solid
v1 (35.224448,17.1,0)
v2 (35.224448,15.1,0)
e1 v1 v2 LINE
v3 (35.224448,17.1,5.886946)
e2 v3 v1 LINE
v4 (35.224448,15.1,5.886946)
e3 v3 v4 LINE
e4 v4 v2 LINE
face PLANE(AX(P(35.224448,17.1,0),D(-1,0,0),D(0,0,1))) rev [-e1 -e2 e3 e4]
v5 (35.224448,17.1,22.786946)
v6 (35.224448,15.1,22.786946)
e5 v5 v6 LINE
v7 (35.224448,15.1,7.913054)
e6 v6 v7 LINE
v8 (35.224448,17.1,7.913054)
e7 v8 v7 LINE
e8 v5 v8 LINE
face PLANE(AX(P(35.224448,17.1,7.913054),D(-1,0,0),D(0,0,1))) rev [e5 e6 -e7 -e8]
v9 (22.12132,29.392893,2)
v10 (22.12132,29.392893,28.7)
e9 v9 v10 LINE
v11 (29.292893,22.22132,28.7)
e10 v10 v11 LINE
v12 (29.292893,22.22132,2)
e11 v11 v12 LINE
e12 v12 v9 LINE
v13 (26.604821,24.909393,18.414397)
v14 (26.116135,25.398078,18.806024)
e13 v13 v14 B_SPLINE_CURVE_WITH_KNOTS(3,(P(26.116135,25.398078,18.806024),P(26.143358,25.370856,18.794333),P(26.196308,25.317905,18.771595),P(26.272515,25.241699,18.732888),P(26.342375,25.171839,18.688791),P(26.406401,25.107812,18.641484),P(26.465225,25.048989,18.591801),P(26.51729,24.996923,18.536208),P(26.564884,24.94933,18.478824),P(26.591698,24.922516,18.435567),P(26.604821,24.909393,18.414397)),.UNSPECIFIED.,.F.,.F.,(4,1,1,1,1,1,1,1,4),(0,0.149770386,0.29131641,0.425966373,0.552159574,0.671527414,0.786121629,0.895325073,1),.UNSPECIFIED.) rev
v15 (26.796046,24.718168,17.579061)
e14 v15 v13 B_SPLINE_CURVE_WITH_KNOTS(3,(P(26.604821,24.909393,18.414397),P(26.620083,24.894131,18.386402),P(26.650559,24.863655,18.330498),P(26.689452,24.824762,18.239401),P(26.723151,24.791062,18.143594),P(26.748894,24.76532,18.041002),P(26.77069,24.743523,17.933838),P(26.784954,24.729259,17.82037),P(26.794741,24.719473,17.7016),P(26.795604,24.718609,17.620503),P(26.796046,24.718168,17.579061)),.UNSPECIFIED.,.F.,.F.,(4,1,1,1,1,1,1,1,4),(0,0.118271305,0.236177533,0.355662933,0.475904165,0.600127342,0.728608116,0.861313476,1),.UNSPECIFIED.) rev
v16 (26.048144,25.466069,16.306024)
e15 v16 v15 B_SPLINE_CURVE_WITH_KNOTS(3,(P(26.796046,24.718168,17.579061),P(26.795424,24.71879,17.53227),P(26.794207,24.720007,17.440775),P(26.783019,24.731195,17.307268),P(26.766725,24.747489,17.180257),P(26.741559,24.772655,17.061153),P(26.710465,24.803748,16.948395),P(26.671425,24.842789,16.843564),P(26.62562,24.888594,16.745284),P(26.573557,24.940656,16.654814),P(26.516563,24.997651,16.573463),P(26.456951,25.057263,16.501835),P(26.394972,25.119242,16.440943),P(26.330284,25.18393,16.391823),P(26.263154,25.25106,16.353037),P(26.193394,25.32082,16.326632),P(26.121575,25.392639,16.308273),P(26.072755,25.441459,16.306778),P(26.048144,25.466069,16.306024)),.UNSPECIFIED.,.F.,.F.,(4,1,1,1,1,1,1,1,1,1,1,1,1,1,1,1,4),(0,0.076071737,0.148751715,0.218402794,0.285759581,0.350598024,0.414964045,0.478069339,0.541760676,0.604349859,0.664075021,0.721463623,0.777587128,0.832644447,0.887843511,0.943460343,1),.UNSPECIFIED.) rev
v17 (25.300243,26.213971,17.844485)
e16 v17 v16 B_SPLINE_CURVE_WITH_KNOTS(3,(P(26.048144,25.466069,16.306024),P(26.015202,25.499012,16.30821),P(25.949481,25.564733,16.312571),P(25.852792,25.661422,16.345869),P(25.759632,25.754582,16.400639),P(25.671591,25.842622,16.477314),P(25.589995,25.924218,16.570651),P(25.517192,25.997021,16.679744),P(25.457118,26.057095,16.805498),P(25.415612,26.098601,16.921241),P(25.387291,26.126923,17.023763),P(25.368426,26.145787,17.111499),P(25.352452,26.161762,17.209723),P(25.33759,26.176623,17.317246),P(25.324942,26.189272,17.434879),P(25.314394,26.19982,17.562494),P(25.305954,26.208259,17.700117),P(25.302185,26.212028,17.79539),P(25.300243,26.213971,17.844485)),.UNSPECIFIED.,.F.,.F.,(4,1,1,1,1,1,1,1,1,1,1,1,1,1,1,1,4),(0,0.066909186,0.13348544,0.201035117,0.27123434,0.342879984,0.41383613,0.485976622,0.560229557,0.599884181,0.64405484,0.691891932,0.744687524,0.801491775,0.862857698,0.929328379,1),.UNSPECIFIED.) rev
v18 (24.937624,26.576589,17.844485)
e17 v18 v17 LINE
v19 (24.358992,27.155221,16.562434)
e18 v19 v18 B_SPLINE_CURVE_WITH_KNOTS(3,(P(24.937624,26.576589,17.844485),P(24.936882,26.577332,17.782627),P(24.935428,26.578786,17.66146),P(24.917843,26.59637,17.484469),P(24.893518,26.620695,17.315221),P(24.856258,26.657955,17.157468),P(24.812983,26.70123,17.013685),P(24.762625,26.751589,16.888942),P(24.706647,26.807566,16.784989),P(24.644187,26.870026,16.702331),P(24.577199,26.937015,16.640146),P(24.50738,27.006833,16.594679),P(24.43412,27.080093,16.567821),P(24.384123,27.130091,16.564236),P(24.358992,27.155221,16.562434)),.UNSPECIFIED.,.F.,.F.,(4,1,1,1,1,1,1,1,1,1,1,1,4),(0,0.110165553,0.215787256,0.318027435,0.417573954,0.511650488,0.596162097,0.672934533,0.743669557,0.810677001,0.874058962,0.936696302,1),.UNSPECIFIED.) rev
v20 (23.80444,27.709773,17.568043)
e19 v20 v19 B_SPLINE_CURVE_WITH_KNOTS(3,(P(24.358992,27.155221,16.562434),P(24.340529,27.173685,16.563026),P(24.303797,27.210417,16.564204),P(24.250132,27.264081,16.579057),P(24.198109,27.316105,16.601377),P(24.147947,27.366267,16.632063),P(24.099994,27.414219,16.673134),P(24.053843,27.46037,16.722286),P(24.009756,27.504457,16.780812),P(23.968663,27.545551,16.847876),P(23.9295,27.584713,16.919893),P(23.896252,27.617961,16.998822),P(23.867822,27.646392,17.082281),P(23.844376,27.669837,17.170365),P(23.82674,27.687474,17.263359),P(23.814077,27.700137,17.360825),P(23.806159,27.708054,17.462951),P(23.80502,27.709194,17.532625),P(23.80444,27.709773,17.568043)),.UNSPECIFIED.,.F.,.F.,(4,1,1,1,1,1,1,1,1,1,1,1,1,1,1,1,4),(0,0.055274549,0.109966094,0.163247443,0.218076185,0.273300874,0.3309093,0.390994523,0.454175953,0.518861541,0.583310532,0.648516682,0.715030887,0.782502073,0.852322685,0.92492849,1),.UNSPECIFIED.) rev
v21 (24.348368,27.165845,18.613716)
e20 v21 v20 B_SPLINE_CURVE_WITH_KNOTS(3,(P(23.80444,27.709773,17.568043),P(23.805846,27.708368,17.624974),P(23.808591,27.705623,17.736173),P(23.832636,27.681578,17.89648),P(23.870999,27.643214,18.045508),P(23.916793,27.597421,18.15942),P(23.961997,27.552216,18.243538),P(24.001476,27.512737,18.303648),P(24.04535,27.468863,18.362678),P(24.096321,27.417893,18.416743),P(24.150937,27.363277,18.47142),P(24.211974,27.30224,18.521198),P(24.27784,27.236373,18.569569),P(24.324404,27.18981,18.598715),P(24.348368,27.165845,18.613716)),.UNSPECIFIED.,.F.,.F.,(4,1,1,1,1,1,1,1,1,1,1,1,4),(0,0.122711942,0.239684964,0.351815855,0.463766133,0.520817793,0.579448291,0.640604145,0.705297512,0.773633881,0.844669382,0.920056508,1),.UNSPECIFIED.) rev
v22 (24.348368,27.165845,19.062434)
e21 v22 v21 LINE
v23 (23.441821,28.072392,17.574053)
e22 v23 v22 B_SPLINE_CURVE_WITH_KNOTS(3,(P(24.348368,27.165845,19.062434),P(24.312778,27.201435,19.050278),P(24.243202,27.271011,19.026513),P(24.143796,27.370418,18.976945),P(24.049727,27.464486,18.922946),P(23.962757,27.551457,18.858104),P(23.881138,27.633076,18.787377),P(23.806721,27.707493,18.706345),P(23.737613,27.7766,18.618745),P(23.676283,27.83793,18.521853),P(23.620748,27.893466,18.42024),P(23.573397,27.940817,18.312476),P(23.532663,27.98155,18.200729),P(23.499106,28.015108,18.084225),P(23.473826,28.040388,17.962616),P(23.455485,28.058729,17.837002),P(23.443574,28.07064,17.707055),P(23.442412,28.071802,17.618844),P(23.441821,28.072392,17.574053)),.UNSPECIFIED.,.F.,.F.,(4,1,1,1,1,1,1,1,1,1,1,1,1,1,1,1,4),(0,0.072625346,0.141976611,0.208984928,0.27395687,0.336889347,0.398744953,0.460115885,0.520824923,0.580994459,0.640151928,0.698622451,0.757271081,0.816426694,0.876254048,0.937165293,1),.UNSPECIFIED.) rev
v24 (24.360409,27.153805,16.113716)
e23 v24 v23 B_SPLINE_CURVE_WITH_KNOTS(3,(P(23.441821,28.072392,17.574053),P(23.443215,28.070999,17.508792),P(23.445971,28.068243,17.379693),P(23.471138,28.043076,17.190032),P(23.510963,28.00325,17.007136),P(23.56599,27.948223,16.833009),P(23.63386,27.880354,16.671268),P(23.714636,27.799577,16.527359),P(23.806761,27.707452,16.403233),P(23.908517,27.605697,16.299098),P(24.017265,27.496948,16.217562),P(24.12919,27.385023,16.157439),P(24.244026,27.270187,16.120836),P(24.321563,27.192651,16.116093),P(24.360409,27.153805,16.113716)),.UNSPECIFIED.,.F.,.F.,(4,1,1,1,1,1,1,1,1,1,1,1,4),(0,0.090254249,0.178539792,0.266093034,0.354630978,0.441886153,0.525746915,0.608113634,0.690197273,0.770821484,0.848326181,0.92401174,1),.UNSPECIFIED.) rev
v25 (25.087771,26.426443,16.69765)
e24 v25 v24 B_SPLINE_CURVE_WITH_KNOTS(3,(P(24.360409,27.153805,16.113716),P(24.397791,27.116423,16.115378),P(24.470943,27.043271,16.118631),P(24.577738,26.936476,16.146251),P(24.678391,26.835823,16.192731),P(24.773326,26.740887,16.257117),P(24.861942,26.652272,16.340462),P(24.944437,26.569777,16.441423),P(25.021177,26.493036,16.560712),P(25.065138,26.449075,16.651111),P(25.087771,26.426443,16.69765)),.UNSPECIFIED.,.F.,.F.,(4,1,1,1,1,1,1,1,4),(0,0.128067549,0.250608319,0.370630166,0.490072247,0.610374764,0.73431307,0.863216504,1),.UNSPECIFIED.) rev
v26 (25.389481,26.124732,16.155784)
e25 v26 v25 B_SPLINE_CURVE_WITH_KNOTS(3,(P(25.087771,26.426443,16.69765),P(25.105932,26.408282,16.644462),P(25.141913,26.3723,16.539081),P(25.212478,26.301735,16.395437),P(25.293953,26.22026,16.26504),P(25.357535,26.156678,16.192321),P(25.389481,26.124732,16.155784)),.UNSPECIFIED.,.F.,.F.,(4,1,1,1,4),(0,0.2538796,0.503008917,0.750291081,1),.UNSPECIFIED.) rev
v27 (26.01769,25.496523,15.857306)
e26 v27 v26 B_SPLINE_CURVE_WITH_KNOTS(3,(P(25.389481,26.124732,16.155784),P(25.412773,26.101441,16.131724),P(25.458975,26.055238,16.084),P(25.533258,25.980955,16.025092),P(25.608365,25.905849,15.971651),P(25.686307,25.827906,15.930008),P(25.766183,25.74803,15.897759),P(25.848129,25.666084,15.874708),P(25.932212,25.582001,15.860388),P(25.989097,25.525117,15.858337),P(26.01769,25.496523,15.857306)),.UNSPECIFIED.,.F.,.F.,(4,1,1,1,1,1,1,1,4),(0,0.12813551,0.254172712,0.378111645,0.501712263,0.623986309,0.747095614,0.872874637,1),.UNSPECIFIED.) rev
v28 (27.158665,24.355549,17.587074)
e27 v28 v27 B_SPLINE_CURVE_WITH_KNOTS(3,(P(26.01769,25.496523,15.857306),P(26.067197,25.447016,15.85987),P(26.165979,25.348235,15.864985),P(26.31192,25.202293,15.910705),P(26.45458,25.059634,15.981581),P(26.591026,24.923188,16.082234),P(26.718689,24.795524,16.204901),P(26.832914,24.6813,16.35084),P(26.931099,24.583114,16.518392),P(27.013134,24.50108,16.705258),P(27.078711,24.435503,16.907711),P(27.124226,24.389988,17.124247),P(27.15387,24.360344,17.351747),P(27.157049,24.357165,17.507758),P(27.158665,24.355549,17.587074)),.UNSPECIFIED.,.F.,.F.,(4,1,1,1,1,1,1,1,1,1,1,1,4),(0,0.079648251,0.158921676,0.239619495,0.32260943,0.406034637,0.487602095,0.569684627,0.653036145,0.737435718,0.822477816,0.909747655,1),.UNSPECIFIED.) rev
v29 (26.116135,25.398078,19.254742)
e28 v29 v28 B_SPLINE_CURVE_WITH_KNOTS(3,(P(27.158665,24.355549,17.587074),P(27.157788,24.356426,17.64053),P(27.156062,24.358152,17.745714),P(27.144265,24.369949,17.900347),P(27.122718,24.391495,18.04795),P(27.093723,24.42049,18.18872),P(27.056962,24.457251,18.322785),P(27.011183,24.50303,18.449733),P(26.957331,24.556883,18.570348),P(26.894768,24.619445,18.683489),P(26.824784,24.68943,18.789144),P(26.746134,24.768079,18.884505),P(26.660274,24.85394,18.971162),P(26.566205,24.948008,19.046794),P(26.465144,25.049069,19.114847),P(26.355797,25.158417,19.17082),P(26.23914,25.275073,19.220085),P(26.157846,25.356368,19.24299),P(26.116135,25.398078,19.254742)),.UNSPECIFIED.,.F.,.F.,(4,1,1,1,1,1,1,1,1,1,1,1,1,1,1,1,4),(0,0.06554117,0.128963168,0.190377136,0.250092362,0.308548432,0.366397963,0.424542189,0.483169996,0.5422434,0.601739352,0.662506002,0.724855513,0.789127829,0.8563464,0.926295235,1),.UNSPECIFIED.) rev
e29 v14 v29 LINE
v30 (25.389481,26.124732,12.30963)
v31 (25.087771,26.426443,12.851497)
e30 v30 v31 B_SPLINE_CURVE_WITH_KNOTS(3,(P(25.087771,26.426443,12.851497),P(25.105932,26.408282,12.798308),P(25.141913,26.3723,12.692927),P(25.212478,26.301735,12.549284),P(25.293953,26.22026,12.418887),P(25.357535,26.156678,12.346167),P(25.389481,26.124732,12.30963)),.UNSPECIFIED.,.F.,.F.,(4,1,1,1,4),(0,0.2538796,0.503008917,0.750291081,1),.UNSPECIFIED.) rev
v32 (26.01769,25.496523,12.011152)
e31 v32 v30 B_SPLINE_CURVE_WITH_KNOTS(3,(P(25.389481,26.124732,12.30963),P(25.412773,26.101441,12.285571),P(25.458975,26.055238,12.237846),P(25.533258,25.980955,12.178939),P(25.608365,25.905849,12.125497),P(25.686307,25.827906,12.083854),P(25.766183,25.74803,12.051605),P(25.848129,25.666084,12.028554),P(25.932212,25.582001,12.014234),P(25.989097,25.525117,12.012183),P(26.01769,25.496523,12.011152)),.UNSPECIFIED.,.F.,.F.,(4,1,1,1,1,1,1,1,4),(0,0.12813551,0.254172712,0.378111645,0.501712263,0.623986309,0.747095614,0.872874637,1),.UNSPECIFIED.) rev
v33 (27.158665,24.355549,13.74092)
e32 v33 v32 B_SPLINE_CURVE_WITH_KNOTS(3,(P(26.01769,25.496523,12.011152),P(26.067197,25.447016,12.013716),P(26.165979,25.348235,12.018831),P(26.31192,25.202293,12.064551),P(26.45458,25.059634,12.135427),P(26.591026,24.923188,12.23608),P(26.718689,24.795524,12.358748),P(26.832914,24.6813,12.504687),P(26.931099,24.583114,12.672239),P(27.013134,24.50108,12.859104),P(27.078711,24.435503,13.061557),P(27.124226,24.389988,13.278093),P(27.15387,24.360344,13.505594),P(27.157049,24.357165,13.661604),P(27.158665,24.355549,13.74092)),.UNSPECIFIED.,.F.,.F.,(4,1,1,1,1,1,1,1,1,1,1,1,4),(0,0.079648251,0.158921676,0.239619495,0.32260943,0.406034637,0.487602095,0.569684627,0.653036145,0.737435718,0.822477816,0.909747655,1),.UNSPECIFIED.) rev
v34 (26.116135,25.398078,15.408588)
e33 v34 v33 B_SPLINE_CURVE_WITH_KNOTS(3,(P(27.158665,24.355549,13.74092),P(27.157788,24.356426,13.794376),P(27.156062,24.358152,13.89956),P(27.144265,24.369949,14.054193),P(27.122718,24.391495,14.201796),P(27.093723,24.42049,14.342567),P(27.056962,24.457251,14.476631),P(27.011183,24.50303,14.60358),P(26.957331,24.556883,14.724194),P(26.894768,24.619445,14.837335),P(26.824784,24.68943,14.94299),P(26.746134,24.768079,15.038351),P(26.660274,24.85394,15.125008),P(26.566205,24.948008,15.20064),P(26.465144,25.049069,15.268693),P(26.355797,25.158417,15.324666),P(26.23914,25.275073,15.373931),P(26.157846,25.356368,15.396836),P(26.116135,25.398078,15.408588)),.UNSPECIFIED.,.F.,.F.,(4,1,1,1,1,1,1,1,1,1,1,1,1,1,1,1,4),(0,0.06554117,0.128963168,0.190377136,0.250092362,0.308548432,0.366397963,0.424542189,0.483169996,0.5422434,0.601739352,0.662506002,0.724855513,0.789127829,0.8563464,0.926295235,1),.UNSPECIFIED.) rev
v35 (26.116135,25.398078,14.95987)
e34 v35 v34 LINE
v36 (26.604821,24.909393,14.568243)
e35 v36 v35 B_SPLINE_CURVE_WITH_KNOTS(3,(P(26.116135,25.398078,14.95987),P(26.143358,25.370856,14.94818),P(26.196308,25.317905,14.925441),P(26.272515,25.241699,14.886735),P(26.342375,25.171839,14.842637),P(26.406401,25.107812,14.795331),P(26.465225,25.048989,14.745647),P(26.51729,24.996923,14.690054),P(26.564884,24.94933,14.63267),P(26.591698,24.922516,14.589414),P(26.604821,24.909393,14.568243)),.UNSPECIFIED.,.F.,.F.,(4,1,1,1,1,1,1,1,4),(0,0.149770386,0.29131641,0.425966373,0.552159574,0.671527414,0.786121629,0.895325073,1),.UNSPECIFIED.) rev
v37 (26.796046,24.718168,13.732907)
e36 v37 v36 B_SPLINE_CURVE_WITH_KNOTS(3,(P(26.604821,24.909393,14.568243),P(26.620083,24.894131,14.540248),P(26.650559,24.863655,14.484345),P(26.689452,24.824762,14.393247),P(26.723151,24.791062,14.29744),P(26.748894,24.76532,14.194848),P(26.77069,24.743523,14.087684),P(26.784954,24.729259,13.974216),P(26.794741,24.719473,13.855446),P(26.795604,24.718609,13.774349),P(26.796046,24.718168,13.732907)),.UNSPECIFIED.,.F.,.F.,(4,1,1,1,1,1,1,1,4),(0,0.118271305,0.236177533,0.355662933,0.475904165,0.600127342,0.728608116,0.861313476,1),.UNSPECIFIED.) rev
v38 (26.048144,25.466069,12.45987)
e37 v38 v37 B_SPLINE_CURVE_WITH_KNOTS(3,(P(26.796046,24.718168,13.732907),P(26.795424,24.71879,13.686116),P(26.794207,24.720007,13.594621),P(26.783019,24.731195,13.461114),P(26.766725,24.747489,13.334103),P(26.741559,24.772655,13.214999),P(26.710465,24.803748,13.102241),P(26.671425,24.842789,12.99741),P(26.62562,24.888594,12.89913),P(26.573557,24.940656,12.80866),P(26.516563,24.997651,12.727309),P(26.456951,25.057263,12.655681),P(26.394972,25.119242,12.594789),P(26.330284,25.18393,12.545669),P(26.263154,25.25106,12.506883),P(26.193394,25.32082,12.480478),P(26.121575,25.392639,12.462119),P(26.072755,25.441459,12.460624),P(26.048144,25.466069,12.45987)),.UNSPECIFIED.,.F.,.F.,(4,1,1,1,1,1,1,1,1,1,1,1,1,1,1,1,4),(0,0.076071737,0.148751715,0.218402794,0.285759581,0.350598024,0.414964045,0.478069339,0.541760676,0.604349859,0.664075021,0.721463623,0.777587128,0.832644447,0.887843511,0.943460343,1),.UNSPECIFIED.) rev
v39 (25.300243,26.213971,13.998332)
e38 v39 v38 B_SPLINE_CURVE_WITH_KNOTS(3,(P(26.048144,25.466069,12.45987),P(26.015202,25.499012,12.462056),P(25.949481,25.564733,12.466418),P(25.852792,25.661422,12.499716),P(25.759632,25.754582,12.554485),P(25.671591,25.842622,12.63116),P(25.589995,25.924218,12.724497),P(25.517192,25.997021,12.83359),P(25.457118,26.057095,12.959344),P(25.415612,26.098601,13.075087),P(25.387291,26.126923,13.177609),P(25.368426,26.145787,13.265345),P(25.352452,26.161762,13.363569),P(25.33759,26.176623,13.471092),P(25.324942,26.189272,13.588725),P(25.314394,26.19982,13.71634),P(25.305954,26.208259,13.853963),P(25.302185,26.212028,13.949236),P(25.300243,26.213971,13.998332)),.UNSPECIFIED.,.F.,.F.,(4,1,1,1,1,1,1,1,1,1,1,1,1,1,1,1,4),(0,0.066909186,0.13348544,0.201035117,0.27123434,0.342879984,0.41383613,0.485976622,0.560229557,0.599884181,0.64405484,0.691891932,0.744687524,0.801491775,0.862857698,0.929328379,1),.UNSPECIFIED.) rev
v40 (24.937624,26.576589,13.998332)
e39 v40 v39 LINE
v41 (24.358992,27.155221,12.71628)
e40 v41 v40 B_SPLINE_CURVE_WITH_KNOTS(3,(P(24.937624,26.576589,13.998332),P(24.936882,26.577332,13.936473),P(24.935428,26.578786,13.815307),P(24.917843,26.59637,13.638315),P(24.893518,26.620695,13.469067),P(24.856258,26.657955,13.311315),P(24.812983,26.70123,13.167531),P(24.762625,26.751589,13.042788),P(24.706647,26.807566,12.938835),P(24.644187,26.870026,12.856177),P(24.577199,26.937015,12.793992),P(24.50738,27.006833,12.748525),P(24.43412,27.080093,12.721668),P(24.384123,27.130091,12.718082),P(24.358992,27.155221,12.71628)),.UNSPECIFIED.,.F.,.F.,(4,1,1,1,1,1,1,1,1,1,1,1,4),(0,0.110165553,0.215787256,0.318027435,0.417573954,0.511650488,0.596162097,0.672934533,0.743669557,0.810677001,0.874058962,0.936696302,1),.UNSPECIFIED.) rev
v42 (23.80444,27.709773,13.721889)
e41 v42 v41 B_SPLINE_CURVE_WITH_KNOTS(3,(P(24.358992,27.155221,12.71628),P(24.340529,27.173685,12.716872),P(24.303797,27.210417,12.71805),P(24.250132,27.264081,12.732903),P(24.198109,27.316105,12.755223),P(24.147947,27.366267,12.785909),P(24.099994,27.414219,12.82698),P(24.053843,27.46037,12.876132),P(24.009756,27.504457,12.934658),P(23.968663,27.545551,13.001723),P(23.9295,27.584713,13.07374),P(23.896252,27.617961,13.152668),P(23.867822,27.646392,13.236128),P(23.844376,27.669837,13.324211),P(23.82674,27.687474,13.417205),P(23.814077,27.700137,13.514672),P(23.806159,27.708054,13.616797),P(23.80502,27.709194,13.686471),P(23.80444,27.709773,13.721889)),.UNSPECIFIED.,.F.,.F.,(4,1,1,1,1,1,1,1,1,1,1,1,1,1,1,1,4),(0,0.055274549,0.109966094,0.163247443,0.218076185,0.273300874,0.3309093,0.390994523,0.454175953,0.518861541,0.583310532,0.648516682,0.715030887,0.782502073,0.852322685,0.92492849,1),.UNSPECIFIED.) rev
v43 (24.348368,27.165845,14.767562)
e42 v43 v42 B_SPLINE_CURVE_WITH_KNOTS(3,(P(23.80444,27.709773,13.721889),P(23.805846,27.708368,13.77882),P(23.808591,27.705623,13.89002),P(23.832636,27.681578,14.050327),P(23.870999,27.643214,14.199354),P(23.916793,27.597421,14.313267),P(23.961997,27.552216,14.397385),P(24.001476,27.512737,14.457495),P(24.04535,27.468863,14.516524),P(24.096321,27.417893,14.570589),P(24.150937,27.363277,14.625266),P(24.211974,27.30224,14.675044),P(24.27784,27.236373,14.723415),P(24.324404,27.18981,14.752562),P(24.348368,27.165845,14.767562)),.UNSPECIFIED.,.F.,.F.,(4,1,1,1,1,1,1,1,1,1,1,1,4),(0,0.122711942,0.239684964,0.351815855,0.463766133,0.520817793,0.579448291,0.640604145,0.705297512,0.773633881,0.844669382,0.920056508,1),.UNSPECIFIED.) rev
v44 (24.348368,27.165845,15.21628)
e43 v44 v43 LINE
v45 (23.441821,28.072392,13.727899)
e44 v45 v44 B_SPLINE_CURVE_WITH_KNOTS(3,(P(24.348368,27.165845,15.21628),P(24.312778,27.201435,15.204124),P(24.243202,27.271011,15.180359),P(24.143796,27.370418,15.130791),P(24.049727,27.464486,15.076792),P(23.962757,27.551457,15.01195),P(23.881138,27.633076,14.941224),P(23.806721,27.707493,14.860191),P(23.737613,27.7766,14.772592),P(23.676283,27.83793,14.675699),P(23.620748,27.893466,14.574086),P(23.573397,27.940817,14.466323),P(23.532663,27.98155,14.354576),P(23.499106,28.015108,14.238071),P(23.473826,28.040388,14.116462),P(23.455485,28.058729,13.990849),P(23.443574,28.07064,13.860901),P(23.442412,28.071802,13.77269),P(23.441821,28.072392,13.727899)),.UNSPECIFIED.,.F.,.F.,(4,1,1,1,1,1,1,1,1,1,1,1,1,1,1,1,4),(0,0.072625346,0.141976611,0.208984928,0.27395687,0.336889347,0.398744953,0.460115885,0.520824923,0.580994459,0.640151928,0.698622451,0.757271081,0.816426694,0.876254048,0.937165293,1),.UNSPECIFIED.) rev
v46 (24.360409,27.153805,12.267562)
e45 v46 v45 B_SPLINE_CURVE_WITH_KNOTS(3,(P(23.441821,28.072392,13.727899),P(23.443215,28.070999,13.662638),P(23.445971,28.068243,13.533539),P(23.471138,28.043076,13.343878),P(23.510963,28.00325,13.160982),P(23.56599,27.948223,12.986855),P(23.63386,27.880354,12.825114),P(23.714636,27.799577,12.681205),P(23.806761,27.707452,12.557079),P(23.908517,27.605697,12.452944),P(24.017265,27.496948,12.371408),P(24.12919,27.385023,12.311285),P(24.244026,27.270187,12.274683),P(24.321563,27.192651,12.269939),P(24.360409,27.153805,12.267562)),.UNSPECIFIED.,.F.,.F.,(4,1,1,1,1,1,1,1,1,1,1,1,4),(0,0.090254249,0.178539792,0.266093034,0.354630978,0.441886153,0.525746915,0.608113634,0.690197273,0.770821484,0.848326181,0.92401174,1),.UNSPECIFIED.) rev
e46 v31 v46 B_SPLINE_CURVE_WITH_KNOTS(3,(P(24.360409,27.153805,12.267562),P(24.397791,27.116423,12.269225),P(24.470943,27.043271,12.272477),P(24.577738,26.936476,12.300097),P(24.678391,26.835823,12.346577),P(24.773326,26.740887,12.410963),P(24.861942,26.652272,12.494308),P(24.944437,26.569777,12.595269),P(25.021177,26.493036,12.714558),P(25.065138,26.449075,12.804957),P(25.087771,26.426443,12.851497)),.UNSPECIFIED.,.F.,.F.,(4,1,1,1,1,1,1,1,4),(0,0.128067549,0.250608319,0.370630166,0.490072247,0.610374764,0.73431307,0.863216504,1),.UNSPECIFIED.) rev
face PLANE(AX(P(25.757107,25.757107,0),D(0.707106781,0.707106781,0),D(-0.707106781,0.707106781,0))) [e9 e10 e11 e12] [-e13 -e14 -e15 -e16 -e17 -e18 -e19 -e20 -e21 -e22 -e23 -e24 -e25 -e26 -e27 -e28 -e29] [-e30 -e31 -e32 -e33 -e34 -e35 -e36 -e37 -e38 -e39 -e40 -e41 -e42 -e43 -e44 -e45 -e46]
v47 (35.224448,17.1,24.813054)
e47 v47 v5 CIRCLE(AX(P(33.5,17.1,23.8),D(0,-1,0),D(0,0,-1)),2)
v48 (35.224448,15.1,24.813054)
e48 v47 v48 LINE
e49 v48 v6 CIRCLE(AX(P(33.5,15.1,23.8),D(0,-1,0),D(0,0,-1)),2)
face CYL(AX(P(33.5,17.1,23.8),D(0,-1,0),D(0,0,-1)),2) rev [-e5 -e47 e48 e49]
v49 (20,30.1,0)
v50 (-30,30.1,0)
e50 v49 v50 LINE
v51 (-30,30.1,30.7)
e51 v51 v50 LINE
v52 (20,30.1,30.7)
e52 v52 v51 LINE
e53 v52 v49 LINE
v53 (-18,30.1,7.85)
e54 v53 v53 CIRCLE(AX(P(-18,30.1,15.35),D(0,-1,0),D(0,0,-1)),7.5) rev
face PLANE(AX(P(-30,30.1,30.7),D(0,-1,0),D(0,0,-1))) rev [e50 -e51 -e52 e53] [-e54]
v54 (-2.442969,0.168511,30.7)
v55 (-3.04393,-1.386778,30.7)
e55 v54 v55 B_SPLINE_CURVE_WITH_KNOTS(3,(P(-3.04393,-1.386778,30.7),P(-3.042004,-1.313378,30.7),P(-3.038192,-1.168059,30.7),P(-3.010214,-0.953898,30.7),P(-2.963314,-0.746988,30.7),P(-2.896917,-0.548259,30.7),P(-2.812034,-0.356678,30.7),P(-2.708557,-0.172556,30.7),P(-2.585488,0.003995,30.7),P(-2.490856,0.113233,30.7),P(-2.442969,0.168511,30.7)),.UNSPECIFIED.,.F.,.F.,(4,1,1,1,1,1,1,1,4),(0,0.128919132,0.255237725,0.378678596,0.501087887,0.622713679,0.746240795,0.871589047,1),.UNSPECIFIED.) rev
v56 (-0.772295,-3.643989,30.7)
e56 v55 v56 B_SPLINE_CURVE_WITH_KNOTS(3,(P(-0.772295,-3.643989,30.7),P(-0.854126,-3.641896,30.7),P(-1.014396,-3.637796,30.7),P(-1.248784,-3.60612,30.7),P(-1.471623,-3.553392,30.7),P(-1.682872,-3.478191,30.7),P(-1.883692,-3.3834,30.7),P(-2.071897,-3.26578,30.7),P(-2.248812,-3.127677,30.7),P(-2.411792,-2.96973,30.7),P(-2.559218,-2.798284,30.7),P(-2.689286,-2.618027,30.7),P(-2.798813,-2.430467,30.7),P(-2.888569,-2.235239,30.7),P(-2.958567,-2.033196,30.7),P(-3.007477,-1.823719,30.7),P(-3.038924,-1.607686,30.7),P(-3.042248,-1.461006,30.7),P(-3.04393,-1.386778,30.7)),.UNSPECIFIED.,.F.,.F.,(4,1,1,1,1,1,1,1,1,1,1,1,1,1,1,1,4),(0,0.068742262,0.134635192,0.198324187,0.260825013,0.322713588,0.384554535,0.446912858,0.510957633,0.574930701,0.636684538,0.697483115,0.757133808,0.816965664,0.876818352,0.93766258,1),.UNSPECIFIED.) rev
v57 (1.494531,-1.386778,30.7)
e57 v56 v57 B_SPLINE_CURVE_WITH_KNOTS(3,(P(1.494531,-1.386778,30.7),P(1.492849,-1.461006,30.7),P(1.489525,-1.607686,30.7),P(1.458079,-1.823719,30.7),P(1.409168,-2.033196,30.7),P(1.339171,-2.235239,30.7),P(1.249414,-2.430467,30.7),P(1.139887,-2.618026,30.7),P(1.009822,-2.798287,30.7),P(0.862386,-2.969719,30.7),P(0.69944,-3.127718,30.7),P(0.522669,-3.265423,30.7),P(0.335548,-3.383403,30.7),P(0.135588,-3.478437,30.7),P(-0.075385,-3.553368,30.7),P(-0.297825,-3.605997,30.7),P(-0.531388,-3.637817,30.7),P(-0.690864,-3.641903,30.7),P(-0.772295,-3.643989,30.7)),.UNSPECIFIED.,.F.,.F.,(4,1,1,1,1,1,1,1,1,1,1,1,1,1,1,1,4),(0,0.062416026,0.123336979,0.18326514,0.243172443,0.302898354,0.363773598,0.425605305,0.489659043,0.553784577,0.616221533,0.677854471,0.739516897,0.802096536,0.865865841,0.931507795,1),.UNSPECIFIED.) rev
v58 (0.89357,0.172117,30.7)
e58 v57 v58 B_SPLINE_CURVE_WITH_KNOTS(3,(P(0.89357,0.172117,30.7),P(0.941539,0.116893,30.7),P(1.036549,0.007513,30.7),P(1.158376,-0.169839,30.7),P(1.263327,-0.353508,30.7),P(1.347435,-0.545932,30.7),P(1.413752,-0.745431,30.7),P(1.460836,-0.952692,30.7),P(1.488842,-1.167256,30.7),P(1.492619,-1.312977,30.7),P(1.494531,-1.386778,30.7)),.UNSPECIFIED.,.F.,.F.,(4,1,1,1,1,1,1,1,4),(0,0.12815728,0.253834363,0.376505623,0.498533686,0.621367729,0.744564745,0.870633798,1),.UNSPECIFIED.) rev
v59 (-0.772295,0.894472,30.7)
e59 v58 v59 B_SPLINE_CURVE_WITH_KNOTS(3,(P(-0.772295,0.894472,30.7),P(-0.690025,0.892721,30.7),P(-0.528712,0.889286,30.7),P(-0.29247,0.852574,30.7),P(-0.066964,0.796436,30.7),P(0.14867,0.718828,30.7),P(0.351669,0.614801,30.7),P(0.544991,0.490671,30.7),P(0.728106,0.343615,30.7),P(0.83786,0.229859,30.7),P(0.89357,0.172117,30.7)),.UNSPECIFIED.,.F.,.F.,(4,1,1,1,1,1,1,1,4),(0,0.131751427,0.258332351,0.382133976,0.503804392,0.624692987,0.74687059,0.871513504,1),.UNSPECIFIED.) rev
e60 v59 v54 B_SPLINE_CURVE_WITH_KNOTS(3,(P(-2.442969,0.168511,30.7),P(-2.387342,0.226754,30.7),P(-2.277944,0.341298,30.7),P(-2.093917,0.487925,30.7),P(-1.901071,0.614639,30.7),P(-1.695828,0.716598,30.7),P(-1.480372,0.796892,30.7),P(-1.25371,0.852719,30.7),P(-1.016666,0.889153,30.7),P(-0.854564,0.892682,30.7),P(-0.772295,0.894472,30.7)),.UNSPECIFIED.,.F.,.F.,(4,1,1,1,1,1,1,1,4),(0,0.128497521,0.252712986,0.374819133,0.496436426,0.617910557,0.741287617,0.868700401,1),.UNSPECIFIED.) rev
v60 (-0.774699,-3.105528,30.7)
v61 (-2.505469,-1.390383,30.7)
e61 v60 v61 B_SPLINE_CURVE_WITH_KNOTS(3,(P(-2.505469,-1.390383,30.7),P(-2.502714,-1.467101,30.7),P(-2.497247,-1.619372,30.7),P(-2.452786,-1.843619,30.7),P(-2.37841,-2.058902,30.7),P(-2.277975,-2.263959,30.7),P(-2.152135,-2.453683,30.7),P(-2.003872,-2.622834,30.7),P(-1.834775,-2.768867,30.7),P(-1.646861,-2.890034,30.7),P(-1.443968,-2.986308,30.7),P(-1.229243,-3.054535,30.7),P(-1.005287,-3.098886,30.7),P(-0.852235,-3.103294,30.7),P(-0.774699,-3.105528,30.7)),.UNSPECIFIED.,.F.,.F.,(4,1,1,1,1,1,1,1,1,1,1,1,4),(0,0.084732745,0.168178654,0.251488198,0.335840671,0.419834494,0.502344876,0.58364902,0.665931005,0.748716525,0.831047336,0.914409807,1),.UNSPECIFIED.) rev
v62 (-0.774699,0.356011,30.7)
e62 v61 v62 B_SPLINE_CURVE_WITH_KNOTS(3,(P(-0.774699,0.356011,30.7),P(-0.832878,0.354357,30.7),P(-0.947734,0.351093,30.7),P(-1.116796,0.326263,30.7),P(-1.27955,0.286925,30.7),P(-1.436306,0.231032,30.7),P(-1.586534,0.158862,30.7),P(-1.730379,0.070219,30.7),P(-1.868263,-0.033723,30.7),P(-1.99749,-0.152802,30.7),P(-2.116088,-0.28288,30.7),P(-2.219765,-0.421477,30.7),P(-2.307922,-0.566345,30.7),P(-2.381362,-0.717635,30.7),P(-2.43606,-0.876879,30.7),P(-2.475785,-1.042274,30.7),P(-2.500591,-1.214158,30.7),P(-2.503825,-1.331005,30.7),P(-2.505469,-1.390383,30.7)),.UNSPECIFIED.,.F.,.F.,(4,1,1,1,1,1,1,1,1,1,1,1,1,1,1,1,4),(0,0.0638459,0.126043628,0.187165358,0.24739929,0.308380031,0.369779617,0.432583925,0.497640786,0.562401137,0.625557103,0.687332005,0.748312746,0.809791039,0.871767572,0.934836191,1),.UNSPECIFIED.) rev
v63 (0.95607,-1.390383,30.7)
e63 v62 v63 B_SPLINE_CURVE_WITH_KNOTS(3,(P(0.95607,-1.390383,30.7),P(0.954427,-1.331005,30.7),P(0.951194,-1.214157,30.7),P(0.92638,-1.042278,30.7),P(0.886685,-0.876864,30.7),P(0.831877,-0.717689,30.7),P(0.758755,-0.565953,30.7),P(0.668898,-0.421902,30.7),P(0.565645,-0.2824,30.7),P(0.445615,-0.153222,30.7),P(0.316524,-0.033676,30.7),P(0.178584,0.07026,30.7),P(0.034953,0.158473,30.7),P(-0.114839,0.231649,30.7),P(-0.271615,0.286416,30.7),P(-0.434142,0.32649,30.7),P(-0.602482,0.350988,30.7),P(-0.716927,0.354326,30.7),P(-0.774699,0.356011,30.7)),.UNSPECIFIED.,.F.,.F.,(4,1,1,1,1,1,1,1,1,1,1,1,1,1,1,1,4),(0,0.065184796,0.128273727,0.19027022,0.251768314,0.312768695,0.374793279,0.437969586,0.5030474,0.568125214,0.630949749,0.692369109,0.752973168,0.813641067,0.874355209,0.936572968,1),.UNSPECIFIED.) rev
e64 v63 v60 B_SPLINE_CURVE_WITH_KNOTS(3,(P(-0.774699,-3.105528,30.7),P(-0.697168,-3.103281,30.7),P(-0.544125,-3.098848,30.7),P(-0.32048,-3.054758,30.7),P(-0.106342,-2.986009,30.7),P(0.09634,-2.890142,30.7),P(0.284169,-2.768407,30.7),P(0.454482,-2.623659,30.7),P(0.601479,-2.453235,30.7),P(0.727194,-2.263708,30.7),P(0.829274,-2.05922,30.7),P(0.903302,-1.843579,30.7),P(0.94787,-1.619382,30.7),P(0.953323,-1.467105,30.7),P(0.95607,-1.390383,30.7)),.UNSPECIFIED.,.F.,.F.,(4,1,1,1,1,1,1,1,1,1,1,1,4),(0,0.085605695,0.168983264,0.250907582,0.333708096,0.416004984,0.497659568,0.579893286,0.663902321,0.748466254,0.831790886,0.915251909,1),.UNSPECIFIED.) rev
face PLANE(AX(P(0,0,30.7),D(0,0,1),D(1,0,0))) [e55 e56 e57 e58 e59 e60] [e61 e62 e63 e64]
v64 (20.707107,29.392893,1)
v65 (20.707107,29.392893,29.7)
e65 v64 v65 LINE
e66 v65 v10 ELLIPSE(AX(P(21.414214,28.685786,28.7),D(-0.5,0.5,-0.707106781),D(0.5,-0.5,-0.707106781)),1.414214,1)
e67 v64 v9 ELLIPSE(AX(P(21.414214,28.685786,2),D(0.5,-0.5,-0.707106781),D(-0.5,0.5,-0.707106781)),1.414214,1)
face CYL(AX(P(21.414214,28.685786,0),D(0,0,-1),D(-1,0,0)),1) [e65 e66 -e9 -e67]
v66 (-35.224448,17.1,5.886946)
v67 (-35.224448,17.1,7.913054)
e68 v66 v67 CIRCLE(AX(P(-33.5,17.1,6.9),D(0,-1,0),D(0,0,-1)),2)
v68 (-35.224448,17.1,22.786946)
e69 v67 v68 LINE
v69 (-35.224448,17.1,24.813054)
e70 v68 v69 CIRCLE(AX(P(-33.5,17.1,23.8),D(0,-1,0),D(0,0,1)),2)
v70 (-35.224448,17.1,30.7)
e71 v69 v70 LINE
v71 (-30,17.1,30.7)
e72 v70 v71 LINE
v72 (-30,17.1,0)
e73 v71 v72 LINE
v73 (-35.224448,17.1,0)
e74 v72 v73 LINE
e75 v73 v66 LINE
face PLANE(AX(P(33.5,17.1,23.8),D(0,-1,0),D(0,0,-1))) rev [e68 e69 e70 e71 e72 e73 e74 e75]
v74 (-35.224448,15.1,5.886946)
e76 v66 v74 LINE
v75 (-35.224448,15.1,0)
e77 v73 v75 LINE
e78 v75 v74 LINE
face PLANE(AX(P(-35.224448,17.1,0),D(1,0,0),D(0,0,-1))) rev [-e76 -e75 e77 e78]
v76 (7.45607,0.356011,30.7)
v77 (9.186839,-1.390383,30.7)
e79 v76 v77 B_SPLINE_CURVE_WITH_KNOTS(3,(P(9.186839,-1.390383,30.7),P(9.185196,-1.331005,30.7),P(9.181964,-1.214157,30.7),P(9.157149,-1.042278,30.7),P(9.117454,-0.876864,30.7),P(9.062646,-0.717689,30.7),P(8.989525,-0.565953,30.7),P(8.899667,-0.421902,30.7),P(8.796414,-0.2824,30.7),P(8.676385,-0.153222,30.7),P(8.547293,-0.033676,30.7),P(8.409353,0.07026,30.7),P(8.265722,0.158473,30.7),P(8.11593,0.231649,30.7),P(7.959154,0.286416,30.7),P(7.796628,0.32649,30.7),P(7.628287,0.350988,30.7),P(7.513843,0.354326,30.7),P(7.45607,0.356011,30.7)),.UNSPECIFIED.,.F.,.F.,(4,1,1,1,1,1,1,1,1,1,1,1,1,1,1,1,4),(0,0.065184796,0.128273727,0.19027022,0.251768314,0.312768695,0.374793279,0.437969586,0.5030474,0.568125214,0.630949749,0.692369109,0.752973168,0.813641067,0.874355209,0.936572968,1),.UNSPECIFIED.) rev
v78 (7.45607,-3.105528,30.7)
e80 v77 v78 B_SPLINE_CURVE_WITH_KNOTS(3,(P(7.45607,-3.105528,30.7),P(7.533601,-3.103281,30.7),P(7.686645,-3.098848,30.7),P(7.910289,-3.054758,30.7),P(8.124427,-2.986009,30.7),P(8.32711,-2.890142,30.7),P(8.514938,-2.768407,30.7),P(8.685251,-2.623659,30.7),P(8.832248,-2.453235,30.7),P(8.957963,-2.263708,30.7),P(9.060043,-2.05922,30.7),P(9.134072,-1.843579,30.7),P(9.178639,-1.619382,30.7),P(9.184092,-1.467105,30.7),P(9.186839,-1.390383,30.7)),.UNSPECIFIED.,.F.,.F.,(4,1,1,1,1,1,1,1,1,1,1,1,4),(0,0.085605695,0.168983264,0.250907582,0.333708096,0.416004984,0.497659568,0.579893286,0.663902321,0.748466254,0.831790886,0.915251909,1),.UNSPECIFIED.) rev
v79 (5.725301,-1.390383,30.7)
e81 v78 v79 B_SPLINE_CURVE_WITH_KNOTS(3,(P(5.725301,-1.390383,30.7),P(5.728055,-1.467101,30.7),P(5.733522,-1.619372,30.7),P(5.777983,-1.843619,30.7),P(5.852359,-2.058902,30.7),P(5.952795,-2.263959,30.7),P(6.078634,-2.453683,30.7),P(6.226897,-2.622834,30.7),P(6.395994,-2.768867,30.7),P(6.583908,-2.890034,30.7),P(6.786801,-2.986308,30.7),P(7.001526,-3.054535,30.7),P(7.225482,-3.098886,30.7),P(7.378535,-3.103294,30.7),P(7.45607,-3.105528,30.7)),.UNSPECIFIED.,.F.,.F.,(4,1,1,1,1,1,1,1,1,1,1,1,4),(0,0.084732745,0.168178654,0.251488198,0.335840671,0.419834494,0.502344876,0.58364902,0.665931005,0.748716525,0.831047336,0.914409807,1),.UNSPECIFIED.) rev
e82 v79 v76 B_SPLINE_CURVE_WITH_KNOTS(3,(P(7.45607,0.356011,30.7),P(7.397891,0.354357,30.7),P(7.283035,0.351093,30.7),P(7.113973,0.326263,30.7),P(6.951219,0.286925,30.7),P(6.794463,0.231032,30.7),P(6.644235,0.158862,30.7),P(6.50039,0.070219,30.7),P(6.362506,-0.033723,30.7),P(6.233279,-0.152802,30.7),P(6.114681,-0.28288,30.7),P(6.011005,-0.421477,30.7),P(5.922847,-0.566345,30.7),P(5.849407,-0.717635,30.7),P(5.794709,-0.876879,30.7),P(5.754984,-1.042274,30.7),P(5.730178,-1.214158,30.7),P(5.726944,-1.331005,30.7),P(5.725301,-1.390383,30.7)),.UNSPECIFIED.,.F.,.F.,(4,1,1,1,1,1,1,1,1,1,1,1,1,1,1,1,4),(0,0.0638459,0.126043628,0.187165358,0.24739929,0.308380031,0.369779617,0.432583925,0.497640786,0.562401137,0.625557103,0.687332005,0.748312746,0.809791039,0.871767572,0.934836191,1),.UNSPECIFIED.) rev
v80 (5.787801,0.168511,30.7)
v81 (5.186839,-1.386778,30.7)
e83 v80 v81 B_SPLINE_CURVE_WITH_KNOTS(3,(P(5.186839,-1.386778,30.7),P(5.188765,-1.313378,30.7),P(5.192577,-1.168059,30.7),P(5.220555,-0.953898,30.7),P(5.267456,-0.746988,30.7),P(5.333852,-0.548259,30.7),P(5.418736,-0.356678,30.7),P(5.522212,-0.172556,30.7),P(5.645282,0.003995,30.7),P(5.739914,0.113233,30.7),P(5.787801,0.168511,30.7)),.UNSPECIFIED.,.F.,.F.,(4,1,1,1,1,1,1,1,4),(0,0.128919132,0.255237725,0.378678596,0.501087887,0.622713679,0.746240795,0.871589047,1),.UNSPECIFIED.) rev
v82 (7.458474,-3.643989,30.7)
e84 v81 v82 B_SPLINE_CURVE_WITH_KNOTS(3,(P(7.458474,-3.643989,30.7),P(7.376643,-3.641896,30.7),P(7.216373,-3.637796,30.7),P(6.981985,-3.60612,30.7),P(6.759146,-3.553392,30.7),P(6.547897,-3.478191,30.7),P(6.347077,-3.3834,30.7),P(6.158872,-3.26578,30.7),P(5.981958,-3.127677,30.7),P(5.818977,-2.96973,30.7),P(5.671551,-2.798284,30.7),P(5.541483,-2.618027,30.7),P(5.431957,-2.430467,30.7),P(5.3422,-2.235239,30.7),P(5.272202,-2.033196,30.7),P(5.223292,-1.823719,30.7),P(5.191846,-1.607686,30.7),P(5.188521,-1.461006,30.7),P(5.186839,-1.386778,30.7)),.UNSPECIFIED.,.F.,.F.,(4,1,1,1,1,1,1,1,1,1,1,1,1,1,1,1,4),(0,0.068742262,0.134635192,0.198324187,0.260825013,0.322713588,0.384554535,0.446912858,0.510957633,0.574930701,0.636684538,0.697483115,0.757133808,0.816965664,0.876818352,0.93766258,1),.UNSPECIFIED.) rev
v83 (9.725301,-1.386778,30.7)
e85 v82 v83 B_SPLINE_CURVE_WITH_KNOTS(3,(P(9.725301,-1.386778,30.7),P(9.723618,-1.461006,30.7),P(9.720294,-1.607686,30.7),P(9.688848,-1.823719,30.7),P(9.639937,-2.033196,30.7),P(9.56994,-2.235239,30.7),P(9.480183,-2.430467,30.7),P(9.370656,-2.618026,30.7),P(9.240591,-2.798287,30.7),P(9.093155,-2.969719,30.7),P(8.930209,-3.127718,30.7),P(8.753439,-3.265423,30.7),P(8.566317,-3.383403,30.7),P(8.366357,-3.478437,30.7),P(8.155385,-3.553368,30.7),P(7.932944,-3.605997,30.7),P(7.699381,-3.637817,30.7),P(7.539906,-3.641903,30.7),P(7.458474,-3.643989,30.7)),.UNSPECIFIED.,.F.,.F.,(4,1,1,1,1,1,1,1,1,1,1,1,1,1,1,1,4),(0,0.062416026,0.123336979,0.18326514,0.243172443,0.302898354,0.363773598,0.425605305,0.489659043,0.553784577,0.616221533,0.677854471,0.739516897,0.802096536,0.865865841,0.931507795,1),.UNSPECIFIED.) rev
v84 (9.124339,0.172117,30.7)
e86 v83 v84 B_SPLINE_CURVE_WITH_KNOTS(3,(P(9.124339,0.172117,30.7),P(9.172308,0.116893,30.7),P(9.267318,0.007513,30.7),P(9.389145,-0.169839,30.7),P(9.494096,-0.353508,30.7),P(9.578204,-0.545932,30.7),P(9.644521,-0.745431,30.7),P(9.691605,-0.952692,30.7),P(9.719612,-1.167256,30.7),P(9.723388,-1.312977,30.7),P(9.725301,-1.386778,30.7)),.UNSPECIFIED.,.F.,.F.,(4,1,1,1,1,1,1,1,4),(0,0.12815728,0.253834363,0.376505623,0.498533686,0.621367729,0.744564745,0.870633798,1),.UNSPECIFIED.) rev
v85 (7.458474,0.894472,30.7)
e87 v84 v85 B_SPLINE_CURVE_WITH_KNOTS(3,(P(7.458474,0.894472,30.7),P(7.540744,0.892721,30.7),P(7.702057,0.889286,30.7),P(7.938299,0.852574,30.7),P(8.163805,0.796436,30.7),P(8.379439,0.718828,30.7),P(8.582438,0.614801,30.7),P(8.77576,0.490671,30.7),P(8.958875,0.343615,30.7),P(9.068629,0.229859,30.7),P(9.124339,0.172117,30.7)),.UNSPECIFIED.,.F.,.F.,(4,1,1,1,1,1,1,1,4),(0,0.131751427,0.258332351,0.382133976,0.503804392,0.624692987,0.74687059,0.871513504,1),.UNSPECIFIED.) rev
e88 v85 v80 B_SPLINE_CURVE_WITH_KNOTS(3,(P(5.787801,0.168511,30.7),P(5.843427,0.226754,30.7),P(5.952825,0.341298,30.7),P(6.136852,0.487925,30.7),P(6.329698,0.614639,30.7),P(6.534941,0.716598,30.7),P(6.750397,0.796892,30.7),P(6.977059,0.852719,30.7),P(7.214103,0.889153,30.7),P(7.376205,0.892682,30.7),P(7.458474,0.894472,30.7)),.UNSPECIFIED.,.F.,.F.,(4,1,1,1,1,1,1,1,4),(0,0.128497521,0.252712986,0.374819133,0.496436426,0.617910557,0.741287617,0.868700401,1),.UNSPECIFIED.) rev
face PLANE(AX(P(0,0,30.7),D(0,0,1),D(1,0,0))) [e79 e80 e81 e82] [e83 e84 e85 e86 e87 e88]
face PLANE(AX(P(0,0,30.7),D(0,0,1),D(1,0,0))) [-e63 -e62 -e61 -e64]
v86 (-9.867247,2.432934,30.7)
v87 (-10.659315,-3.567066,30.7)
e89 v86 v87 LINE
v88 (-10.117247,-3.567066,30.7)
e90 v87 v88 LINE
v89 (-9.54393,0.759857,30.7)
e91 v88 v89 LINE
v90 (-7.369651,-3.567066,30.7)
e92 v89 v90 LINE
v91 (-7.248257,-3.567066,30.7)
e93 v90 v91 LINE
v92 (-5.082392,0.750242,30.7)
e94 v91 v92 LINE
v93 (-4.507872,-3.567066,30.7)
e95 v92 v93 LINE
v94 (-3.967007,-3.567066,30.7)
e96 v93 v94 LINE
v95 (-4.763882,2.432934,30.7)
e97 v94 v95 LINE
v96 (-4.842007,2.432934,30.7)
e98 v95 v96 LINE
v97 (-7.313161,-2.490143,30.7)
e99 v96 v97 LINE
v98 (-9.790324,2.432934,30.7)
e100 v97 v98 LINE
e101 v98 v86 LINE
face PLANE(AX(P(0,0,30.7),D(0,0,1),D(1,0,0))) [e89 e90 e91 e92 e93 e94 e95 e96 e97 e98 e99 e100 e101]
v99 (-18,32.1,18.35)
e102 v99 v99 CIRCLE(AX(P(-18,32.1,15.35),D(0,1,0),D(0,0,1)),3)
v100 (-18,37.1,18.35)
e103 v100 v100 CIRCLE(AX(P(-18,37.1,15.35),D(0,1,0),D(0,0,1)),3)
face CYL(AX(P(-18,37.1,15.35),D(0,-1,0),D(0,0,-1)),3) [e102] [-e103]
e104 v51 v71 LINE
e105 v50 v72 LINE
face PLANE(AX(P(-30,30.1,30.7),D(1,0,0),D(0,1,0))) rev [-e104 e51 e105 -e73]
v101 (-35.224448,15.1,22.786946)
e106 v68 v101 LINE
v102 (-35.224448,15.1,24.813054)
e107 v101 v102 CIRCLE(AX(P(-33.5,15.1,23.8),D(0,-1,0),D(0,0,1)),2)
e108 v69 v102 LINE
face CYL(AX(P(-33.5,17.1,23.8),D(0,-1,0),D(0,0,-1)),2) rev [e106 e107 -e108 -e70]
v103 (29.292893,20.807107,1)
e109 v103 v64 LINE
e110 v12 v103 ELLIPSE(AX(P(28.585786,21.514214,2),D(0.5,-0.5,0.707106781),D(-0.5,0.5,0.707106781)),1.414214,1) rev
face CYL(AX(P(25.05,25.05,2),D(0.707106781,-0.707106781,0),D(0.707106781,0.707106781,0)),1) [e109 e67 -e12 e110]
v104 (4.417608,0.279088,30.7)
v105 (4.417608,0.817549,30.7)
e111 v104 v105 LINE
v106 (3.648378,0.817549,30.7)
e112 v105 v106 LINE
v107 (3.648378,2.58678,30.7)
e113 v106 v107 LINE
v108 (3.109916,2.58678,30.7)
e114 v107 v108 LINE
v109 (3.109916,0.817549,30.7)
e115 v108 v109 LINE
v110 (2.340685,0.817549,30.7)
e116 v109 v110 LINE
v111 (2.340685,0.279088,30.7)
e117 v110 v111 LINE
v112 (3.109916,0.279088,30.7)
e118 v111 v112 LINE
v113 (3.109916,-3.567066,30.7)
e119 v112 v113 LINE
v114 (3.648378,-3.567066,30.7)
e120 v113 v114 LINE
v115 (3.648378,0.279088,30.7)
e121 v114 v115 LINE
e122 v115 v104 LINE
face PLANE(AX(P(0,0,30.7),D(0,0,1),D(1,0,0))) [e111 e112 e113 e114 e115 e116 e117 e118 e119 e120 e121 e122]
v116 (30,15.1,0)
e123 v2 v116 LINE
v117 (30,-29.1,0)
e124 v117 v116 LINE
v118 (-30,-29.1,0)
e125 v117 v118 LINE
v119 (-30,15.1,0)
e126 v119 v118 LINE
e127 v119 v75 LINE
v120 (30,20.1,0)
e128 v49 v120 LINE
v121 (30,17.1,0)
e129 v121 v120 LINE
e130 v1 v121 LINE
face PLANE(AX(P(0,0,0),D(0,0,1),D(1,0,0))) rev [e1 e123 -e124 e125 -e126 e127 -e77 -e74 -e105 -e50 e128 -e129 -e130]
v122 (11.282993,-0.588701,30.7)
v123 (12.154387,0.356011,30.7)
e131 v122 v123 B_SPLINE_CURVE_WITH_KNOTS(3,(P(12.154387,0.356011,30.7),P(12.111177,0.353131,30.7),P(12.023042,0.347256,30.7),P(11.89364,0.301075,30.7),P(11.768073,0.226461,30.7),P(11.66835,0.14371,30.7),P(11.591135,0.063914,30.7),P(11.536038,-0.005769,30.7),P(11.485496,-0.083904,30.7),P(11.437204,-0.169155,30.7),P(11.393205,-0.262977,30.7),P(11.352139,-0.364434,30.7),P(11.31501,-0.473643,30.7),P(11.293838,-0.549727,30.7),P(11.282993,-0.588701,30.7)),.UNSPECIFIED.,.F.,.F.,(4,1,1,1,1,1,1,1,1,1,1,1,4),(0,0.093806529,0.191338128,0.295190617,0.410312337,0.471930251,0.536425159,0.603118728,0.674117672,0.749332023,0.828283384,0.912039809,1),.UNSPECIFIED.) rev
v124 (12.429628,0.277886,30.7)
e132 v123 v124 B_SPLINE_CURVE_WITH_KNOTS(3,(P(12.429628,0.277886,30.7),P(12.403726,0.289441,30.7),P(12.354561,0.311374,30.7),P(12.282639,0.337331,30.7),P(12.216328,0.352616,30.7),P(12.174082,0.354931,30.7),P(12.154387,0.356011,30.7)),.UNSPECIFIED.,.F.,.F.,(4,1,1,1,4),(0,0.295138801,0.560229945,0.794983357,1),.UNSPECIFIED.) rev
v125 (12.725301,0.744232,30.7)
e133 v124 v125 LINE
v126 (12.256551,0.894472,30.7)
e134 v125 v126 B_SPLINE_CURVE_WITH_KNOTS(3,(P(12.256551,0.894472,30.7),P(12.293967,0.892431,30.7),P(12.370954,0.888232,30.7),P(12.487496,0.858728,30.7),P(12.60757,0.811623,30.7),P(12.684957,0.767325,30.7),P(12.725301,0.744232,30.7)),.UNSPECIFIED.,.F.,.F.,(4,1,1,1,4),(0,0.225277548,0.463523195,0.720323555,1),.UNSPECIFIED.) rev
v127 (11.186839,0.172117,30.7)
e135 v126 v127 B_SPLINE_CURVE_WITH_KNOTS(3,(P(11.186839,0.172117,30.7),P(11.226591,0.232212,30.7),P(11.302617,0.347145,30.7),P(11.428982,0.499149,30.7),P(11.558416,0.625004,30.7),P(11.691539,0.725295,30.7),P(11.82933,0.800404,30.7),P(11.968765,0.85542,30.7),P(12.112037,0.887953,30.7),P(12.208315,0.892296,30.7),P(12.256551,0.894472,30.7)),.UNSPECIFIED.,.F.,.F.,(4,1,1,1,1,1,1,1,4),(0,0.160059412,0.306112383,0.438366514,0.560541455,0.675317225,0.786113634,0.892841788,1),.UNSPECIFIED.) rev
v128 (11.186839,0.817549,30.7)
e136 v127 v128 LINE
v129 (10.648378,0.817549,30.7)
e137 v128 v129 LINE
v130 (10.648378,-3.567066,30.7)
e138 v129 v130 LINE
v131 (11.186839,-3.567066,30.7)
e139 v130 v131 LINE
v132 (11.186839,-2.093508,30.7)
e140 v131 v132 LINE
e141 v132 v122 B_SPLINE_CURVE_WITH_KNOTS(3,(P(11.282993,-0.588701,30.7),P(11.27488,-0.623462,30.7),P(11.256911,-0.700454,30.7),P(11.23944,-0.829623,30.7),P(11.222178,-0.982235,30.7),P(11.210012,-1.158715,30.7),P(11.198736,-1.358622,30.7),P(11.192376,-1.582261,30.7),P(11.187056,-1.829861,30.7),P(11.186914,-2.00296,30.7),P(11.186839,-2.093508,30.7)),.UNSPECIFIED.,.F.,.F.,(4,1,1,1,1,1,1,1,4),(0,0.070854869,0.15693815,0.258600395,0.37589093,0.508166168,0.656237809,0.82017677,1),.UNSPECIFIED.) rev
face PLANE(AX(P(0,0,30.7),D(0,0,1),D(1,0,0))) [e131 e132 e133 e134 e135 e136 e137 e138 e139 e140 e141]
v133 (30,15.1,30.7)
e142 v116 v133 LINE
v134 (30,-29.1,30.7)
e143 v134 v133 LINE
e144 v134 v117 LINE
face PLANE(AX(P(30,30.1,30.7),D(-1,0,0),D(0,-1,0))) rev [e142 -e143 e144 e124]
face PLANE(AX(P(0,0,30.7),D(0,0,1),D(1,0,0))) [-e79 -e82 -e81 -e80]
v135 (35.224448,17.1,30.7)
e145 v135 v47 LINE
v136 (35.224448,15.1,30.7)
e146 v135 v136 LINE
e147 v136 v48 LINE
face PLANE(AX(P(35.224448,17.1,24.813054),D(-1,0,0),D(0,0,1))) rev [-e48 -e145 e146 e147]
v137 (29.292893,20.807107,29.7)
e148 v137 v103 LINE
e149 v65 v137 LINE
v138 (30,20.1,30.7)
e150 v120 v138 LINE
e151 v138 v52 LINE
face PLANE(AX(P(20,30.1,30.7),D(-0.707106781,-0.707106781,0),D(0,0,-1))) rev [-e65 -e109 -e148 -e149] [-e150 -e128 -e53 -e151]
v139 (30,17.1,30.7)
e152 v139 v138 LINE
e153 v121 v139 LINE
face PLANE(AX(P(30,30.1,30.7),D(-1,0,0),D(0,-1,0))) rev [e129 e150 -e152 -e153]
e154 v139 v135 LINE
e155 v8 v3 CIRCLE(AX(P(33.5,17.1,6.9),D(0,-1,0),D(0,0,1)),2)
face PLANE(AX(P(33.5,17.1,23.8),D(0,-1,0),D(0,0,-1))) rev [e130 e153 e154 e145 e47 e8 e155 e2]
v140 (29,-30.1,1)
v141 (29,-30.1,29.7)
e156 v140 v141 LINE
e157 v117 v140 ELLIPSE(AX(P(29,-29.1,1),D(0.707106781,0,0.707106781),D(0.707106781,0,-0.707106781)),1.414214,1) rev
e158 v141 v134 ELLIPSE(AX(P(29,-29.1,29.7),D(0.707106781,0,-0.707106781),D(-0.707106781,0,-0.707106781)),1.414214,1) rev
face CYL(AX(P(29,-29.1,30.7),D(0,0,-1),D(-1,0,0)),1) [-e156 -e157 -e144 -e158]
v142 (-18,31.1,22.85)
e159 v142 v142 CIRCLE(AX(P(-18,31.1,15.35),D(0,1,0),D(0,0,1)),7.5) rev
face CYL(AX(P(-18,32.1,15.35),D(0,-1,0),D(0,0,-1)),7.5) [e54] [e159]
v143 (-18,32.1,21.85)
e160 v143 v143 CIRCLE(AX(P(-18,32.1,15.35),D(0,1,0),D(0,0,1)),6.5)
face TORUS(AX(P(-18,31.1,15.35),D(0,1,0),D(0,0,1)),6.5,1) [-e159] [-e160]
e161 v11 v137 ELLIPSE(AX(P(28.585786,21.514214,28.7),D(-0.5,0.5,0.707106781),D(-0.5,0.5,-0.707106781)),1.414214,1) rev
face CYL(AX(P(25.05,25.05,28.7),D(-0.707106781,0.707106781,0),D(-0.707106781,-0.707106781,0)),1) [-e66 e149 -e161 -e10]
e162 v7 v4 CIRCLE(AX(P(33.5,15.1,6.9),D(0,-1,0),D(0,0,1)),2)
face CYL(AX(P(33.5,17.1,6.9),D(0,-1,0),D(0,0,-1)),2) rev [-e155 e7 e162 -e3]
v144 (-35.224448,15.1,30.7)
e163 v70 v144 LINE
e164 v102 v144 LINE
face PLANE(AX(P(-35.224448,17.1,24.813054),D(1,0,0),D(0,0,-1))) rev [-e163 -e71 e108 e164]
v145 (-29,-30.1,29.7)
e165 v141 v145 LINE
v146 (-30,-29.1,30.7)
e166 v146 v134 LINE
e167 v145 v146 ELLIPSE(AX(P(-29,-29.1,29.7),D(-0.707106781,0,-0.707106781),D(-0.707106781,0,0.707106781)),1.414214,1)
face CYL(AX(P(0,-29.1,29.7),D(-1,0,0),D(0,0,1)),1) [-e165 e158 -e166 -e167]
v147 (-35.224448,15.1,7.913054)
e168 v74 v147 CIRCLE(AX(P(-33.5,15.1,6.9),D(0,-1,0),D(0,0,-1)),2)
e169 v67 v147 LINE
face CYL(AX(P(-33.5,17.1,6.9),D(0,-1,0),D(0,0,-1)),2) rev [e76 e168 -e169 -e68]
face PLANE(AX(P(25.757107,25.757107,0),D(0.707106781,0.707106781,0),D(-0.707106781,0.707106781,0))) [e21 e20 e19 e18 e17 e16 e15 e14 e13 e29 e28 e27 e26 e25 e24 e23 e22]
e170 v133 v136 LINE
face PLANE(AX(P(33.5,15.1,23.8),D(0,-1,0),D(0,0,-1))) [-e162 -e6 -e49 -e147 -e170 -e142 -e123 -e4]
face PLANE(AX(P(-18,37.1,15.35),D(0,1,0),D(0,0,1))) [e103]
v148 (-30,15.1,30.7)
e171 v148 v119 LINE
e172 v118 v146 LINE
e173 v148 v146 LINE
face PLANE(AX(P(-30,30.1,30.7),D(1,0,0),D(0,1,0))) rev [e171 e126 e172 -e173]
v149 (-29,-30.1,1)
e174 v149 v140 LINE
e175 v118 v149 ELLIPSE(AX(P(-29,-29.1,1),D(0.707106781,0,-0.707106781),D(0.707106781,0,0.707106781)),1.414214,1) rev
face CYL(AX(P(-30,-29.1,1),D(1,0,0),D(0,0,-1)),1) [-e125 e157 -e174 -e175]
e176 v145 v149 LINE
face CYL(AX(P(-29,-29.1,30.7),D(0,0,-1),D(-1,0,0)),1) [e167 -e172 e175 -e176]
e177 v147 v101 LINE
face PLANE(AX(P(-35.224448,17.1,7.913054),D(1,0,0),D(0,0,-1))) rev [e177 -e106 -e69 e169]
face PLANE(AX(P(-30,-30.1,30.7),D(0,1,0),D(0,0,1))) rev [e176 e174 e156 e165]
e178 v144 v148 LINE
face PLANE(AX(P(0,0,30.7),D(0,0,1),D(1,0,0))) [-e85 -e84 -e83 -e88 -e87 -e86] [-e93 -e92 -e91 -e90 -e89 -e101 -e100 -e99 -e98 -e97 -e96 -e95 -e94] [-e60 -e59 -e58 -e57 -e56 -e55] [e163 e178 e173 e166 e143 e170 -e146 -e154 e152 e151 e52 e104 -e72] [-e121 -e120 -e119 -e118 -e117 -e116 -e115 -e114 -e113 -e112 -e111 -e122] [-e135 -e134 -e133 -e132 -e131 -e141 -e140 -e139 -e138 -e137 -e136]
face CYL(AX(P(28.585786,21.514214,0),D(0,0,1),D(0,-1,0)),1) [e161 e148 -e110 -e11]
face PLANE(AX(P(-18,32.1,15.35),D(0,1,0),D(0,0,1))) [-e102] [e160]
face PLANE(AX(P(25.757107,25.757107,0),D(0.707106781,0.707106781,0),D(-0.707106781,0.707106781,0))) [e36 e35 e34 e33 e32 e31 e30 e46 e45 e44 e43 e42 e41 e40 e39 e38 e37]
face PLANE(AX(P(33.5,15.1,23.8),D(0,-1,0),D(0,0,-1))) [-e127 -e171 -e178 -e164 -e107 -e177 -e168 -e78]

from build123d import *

# Parameters (mm, degrees)
SKETCH1_W           = 60
SKETCH1_H           = 60.2
BOSS_EXTRUDE1_DEPTH = 30.7
BOSS_EXTRUDE2_START = -15
BOSS_EXTRUDE2_DEPTH = 2
SKETCH3_R           = 3
BOSS_EXTRUDE3_DEPTH = 7
CHAMFER1_SIZE       = 10
SKETCH5_R           = 7.5
SKETCH5_R_2         = 3
BOSS_EXTRUDE4_DEPTH = 2
FILLET1_R           = 1
FILLET2_R           = 1
SKETCH6_W           = 28.7
SKETCH6_H           = 12.142135624
BOSS_EXTRUDE5_DEPTH = 1
FILLET3_R           = 1


with BuildPart() as part:
    # Sketch1 → Boss-Extrude1 (new body)
    with BuildSketch(Plane.XY):
        Rectangle(SKETCH1_W, SKETCH1_H)
    extrude(amount=BOSS_EXTRUDE1_DEPTH)

    # Sketch2 → Boss-Extrude2 (add)
    with BuildSketch(Plane(origin=(0, 30.1, 0), x_dir=(1, 0, 0), z_dir=(0, 1, 0)).offset(BOSS_EXTRUDE2_START)):
        with BuildLine():
            Line((-35.224448097, 0), (35.224448097, 0))
            Line((35.224448097, 0), (35.224448097, -5.886945825))
            ThreePointArc((35.224448097, -5.886945825), (31.5, -6.9), (35.224448097, -7.913054175))
            Line((35.224448097, -7.913054175), (35.224448097, -22.786945825))
            ThreePointArc((35.224448097, -22.786945825), (31.5, -23.8), (35.224448097, -24.813054175))
            Line((35.224448097, -24.813054175), (35.224448097, -30.7))
            Line((35.224448097, -30.7), (-35.224448097, -30.7))
            Line((-35.224448097, -30.7), (-35.224448097, -24.813054175))
            ThreePointArc((-35.224448097, -24.813054175), (-31.5, -23.8), (-35.224448097, -22.786945825))
            Line((-35.224448097, -22.786945825), (-35.224448097, -7.913054175))
            ThreePointArc((-35.224448097, -7.913054175), (-31.5, -6.9), (-35.224448097, -5.886945825))
            Line((-35.224448097, -5.886945825), (-35.224448097, 0))
        make_face()
    extrude(amount=BOSS_EXTRUDE2_DEPTH)

    # Sketch3 → Boss-Extrude3 (add)
    with BuildSketch(Plane(origin=(0, 30.1, 0), x_dir=(1, 0, 0), z_dir=(0, 1, 0))):
        with Locations(Location((-18, -15.35, 0), (0, 0, 90))):
            Circle(SKETCH3_R)
    extrude(amount=BOSS_EXTRUDE3_DEPTH)

    # Chamfer1
    chamfer1_edges = [part.edges().sort_by_distance(p)[0] for p in [
        (30, 30.1, 15.35),
    ]]
    chamfer(chamfer1_edges, length=CHAMFER1_SIZE)

    # Sketch5 → Boss-Extrude4 (add)
    with BuildSketch(Plane(origin=(0, 30.1, 0), x_dir=(1, 0, 0), z_dir=(0, 1, 0))):
        with Locations(Location((-18, -15.35, 0), (0, 0, 90))):
            Circle(SKETCH5_R)
        with Locations(Location((-18, -15.35, 0), (0, 0, 270))):
            Circle(SKETCH5_R_2, mode=Mode.SUBTRACT)
    extrude(amount=BOSS_EXTRUDE4_DEPTH)

    # Fillet1
    fillet1_edges = [part.edges().sort_by_distance(p)[0] for p in [
        (-18, 32.1, 22.85),
    ]]
    fillet(fillet1_edges, radius=FILLET1_R)

    # Fillet2
    fillet2_edges = [part.edges().sort_by_distance(p)[0] for p in [
        (0, -30.1, 30.7),
        (0, -30.1, 0),
        (30, -30.1, 15.35),
        (-30, -30.1, 15.35),
    ]]
    fillet(fillet2_edges, radius=FILLET2_R)

    # Sketch6 → Boss-Extrude5 (add)
    with BuildSketch(Plane(origin=(25.05, 25.05, 0), x_dir=(0, 0, -1), z_dir=(0.707106781186549, 0.707106781186546, 0))):
        with Locations((-15.35, 0.070710678)):
            Rectangle(SKETCH6_W, SKETCH6_H)
    extrude(amount=BOSS_EXTRUDE5_DEPTH)

    # Fillet3
    fillet3_edges = [part.edges().sort_by_distance(p)[0] for p in [
        (25.707106781, 25.807106781, 1),
        (30, 21.514213562, 15.35),
        (25.707106781, 25.807106781, 29.7),
        (21.414213562, 30.1, 15.35),
    ]]
    fillet(fillet3_edges, radius=FILLET3_R - 0.0001)  # a hair under: the kernel refuses the full size


solid = part.part
